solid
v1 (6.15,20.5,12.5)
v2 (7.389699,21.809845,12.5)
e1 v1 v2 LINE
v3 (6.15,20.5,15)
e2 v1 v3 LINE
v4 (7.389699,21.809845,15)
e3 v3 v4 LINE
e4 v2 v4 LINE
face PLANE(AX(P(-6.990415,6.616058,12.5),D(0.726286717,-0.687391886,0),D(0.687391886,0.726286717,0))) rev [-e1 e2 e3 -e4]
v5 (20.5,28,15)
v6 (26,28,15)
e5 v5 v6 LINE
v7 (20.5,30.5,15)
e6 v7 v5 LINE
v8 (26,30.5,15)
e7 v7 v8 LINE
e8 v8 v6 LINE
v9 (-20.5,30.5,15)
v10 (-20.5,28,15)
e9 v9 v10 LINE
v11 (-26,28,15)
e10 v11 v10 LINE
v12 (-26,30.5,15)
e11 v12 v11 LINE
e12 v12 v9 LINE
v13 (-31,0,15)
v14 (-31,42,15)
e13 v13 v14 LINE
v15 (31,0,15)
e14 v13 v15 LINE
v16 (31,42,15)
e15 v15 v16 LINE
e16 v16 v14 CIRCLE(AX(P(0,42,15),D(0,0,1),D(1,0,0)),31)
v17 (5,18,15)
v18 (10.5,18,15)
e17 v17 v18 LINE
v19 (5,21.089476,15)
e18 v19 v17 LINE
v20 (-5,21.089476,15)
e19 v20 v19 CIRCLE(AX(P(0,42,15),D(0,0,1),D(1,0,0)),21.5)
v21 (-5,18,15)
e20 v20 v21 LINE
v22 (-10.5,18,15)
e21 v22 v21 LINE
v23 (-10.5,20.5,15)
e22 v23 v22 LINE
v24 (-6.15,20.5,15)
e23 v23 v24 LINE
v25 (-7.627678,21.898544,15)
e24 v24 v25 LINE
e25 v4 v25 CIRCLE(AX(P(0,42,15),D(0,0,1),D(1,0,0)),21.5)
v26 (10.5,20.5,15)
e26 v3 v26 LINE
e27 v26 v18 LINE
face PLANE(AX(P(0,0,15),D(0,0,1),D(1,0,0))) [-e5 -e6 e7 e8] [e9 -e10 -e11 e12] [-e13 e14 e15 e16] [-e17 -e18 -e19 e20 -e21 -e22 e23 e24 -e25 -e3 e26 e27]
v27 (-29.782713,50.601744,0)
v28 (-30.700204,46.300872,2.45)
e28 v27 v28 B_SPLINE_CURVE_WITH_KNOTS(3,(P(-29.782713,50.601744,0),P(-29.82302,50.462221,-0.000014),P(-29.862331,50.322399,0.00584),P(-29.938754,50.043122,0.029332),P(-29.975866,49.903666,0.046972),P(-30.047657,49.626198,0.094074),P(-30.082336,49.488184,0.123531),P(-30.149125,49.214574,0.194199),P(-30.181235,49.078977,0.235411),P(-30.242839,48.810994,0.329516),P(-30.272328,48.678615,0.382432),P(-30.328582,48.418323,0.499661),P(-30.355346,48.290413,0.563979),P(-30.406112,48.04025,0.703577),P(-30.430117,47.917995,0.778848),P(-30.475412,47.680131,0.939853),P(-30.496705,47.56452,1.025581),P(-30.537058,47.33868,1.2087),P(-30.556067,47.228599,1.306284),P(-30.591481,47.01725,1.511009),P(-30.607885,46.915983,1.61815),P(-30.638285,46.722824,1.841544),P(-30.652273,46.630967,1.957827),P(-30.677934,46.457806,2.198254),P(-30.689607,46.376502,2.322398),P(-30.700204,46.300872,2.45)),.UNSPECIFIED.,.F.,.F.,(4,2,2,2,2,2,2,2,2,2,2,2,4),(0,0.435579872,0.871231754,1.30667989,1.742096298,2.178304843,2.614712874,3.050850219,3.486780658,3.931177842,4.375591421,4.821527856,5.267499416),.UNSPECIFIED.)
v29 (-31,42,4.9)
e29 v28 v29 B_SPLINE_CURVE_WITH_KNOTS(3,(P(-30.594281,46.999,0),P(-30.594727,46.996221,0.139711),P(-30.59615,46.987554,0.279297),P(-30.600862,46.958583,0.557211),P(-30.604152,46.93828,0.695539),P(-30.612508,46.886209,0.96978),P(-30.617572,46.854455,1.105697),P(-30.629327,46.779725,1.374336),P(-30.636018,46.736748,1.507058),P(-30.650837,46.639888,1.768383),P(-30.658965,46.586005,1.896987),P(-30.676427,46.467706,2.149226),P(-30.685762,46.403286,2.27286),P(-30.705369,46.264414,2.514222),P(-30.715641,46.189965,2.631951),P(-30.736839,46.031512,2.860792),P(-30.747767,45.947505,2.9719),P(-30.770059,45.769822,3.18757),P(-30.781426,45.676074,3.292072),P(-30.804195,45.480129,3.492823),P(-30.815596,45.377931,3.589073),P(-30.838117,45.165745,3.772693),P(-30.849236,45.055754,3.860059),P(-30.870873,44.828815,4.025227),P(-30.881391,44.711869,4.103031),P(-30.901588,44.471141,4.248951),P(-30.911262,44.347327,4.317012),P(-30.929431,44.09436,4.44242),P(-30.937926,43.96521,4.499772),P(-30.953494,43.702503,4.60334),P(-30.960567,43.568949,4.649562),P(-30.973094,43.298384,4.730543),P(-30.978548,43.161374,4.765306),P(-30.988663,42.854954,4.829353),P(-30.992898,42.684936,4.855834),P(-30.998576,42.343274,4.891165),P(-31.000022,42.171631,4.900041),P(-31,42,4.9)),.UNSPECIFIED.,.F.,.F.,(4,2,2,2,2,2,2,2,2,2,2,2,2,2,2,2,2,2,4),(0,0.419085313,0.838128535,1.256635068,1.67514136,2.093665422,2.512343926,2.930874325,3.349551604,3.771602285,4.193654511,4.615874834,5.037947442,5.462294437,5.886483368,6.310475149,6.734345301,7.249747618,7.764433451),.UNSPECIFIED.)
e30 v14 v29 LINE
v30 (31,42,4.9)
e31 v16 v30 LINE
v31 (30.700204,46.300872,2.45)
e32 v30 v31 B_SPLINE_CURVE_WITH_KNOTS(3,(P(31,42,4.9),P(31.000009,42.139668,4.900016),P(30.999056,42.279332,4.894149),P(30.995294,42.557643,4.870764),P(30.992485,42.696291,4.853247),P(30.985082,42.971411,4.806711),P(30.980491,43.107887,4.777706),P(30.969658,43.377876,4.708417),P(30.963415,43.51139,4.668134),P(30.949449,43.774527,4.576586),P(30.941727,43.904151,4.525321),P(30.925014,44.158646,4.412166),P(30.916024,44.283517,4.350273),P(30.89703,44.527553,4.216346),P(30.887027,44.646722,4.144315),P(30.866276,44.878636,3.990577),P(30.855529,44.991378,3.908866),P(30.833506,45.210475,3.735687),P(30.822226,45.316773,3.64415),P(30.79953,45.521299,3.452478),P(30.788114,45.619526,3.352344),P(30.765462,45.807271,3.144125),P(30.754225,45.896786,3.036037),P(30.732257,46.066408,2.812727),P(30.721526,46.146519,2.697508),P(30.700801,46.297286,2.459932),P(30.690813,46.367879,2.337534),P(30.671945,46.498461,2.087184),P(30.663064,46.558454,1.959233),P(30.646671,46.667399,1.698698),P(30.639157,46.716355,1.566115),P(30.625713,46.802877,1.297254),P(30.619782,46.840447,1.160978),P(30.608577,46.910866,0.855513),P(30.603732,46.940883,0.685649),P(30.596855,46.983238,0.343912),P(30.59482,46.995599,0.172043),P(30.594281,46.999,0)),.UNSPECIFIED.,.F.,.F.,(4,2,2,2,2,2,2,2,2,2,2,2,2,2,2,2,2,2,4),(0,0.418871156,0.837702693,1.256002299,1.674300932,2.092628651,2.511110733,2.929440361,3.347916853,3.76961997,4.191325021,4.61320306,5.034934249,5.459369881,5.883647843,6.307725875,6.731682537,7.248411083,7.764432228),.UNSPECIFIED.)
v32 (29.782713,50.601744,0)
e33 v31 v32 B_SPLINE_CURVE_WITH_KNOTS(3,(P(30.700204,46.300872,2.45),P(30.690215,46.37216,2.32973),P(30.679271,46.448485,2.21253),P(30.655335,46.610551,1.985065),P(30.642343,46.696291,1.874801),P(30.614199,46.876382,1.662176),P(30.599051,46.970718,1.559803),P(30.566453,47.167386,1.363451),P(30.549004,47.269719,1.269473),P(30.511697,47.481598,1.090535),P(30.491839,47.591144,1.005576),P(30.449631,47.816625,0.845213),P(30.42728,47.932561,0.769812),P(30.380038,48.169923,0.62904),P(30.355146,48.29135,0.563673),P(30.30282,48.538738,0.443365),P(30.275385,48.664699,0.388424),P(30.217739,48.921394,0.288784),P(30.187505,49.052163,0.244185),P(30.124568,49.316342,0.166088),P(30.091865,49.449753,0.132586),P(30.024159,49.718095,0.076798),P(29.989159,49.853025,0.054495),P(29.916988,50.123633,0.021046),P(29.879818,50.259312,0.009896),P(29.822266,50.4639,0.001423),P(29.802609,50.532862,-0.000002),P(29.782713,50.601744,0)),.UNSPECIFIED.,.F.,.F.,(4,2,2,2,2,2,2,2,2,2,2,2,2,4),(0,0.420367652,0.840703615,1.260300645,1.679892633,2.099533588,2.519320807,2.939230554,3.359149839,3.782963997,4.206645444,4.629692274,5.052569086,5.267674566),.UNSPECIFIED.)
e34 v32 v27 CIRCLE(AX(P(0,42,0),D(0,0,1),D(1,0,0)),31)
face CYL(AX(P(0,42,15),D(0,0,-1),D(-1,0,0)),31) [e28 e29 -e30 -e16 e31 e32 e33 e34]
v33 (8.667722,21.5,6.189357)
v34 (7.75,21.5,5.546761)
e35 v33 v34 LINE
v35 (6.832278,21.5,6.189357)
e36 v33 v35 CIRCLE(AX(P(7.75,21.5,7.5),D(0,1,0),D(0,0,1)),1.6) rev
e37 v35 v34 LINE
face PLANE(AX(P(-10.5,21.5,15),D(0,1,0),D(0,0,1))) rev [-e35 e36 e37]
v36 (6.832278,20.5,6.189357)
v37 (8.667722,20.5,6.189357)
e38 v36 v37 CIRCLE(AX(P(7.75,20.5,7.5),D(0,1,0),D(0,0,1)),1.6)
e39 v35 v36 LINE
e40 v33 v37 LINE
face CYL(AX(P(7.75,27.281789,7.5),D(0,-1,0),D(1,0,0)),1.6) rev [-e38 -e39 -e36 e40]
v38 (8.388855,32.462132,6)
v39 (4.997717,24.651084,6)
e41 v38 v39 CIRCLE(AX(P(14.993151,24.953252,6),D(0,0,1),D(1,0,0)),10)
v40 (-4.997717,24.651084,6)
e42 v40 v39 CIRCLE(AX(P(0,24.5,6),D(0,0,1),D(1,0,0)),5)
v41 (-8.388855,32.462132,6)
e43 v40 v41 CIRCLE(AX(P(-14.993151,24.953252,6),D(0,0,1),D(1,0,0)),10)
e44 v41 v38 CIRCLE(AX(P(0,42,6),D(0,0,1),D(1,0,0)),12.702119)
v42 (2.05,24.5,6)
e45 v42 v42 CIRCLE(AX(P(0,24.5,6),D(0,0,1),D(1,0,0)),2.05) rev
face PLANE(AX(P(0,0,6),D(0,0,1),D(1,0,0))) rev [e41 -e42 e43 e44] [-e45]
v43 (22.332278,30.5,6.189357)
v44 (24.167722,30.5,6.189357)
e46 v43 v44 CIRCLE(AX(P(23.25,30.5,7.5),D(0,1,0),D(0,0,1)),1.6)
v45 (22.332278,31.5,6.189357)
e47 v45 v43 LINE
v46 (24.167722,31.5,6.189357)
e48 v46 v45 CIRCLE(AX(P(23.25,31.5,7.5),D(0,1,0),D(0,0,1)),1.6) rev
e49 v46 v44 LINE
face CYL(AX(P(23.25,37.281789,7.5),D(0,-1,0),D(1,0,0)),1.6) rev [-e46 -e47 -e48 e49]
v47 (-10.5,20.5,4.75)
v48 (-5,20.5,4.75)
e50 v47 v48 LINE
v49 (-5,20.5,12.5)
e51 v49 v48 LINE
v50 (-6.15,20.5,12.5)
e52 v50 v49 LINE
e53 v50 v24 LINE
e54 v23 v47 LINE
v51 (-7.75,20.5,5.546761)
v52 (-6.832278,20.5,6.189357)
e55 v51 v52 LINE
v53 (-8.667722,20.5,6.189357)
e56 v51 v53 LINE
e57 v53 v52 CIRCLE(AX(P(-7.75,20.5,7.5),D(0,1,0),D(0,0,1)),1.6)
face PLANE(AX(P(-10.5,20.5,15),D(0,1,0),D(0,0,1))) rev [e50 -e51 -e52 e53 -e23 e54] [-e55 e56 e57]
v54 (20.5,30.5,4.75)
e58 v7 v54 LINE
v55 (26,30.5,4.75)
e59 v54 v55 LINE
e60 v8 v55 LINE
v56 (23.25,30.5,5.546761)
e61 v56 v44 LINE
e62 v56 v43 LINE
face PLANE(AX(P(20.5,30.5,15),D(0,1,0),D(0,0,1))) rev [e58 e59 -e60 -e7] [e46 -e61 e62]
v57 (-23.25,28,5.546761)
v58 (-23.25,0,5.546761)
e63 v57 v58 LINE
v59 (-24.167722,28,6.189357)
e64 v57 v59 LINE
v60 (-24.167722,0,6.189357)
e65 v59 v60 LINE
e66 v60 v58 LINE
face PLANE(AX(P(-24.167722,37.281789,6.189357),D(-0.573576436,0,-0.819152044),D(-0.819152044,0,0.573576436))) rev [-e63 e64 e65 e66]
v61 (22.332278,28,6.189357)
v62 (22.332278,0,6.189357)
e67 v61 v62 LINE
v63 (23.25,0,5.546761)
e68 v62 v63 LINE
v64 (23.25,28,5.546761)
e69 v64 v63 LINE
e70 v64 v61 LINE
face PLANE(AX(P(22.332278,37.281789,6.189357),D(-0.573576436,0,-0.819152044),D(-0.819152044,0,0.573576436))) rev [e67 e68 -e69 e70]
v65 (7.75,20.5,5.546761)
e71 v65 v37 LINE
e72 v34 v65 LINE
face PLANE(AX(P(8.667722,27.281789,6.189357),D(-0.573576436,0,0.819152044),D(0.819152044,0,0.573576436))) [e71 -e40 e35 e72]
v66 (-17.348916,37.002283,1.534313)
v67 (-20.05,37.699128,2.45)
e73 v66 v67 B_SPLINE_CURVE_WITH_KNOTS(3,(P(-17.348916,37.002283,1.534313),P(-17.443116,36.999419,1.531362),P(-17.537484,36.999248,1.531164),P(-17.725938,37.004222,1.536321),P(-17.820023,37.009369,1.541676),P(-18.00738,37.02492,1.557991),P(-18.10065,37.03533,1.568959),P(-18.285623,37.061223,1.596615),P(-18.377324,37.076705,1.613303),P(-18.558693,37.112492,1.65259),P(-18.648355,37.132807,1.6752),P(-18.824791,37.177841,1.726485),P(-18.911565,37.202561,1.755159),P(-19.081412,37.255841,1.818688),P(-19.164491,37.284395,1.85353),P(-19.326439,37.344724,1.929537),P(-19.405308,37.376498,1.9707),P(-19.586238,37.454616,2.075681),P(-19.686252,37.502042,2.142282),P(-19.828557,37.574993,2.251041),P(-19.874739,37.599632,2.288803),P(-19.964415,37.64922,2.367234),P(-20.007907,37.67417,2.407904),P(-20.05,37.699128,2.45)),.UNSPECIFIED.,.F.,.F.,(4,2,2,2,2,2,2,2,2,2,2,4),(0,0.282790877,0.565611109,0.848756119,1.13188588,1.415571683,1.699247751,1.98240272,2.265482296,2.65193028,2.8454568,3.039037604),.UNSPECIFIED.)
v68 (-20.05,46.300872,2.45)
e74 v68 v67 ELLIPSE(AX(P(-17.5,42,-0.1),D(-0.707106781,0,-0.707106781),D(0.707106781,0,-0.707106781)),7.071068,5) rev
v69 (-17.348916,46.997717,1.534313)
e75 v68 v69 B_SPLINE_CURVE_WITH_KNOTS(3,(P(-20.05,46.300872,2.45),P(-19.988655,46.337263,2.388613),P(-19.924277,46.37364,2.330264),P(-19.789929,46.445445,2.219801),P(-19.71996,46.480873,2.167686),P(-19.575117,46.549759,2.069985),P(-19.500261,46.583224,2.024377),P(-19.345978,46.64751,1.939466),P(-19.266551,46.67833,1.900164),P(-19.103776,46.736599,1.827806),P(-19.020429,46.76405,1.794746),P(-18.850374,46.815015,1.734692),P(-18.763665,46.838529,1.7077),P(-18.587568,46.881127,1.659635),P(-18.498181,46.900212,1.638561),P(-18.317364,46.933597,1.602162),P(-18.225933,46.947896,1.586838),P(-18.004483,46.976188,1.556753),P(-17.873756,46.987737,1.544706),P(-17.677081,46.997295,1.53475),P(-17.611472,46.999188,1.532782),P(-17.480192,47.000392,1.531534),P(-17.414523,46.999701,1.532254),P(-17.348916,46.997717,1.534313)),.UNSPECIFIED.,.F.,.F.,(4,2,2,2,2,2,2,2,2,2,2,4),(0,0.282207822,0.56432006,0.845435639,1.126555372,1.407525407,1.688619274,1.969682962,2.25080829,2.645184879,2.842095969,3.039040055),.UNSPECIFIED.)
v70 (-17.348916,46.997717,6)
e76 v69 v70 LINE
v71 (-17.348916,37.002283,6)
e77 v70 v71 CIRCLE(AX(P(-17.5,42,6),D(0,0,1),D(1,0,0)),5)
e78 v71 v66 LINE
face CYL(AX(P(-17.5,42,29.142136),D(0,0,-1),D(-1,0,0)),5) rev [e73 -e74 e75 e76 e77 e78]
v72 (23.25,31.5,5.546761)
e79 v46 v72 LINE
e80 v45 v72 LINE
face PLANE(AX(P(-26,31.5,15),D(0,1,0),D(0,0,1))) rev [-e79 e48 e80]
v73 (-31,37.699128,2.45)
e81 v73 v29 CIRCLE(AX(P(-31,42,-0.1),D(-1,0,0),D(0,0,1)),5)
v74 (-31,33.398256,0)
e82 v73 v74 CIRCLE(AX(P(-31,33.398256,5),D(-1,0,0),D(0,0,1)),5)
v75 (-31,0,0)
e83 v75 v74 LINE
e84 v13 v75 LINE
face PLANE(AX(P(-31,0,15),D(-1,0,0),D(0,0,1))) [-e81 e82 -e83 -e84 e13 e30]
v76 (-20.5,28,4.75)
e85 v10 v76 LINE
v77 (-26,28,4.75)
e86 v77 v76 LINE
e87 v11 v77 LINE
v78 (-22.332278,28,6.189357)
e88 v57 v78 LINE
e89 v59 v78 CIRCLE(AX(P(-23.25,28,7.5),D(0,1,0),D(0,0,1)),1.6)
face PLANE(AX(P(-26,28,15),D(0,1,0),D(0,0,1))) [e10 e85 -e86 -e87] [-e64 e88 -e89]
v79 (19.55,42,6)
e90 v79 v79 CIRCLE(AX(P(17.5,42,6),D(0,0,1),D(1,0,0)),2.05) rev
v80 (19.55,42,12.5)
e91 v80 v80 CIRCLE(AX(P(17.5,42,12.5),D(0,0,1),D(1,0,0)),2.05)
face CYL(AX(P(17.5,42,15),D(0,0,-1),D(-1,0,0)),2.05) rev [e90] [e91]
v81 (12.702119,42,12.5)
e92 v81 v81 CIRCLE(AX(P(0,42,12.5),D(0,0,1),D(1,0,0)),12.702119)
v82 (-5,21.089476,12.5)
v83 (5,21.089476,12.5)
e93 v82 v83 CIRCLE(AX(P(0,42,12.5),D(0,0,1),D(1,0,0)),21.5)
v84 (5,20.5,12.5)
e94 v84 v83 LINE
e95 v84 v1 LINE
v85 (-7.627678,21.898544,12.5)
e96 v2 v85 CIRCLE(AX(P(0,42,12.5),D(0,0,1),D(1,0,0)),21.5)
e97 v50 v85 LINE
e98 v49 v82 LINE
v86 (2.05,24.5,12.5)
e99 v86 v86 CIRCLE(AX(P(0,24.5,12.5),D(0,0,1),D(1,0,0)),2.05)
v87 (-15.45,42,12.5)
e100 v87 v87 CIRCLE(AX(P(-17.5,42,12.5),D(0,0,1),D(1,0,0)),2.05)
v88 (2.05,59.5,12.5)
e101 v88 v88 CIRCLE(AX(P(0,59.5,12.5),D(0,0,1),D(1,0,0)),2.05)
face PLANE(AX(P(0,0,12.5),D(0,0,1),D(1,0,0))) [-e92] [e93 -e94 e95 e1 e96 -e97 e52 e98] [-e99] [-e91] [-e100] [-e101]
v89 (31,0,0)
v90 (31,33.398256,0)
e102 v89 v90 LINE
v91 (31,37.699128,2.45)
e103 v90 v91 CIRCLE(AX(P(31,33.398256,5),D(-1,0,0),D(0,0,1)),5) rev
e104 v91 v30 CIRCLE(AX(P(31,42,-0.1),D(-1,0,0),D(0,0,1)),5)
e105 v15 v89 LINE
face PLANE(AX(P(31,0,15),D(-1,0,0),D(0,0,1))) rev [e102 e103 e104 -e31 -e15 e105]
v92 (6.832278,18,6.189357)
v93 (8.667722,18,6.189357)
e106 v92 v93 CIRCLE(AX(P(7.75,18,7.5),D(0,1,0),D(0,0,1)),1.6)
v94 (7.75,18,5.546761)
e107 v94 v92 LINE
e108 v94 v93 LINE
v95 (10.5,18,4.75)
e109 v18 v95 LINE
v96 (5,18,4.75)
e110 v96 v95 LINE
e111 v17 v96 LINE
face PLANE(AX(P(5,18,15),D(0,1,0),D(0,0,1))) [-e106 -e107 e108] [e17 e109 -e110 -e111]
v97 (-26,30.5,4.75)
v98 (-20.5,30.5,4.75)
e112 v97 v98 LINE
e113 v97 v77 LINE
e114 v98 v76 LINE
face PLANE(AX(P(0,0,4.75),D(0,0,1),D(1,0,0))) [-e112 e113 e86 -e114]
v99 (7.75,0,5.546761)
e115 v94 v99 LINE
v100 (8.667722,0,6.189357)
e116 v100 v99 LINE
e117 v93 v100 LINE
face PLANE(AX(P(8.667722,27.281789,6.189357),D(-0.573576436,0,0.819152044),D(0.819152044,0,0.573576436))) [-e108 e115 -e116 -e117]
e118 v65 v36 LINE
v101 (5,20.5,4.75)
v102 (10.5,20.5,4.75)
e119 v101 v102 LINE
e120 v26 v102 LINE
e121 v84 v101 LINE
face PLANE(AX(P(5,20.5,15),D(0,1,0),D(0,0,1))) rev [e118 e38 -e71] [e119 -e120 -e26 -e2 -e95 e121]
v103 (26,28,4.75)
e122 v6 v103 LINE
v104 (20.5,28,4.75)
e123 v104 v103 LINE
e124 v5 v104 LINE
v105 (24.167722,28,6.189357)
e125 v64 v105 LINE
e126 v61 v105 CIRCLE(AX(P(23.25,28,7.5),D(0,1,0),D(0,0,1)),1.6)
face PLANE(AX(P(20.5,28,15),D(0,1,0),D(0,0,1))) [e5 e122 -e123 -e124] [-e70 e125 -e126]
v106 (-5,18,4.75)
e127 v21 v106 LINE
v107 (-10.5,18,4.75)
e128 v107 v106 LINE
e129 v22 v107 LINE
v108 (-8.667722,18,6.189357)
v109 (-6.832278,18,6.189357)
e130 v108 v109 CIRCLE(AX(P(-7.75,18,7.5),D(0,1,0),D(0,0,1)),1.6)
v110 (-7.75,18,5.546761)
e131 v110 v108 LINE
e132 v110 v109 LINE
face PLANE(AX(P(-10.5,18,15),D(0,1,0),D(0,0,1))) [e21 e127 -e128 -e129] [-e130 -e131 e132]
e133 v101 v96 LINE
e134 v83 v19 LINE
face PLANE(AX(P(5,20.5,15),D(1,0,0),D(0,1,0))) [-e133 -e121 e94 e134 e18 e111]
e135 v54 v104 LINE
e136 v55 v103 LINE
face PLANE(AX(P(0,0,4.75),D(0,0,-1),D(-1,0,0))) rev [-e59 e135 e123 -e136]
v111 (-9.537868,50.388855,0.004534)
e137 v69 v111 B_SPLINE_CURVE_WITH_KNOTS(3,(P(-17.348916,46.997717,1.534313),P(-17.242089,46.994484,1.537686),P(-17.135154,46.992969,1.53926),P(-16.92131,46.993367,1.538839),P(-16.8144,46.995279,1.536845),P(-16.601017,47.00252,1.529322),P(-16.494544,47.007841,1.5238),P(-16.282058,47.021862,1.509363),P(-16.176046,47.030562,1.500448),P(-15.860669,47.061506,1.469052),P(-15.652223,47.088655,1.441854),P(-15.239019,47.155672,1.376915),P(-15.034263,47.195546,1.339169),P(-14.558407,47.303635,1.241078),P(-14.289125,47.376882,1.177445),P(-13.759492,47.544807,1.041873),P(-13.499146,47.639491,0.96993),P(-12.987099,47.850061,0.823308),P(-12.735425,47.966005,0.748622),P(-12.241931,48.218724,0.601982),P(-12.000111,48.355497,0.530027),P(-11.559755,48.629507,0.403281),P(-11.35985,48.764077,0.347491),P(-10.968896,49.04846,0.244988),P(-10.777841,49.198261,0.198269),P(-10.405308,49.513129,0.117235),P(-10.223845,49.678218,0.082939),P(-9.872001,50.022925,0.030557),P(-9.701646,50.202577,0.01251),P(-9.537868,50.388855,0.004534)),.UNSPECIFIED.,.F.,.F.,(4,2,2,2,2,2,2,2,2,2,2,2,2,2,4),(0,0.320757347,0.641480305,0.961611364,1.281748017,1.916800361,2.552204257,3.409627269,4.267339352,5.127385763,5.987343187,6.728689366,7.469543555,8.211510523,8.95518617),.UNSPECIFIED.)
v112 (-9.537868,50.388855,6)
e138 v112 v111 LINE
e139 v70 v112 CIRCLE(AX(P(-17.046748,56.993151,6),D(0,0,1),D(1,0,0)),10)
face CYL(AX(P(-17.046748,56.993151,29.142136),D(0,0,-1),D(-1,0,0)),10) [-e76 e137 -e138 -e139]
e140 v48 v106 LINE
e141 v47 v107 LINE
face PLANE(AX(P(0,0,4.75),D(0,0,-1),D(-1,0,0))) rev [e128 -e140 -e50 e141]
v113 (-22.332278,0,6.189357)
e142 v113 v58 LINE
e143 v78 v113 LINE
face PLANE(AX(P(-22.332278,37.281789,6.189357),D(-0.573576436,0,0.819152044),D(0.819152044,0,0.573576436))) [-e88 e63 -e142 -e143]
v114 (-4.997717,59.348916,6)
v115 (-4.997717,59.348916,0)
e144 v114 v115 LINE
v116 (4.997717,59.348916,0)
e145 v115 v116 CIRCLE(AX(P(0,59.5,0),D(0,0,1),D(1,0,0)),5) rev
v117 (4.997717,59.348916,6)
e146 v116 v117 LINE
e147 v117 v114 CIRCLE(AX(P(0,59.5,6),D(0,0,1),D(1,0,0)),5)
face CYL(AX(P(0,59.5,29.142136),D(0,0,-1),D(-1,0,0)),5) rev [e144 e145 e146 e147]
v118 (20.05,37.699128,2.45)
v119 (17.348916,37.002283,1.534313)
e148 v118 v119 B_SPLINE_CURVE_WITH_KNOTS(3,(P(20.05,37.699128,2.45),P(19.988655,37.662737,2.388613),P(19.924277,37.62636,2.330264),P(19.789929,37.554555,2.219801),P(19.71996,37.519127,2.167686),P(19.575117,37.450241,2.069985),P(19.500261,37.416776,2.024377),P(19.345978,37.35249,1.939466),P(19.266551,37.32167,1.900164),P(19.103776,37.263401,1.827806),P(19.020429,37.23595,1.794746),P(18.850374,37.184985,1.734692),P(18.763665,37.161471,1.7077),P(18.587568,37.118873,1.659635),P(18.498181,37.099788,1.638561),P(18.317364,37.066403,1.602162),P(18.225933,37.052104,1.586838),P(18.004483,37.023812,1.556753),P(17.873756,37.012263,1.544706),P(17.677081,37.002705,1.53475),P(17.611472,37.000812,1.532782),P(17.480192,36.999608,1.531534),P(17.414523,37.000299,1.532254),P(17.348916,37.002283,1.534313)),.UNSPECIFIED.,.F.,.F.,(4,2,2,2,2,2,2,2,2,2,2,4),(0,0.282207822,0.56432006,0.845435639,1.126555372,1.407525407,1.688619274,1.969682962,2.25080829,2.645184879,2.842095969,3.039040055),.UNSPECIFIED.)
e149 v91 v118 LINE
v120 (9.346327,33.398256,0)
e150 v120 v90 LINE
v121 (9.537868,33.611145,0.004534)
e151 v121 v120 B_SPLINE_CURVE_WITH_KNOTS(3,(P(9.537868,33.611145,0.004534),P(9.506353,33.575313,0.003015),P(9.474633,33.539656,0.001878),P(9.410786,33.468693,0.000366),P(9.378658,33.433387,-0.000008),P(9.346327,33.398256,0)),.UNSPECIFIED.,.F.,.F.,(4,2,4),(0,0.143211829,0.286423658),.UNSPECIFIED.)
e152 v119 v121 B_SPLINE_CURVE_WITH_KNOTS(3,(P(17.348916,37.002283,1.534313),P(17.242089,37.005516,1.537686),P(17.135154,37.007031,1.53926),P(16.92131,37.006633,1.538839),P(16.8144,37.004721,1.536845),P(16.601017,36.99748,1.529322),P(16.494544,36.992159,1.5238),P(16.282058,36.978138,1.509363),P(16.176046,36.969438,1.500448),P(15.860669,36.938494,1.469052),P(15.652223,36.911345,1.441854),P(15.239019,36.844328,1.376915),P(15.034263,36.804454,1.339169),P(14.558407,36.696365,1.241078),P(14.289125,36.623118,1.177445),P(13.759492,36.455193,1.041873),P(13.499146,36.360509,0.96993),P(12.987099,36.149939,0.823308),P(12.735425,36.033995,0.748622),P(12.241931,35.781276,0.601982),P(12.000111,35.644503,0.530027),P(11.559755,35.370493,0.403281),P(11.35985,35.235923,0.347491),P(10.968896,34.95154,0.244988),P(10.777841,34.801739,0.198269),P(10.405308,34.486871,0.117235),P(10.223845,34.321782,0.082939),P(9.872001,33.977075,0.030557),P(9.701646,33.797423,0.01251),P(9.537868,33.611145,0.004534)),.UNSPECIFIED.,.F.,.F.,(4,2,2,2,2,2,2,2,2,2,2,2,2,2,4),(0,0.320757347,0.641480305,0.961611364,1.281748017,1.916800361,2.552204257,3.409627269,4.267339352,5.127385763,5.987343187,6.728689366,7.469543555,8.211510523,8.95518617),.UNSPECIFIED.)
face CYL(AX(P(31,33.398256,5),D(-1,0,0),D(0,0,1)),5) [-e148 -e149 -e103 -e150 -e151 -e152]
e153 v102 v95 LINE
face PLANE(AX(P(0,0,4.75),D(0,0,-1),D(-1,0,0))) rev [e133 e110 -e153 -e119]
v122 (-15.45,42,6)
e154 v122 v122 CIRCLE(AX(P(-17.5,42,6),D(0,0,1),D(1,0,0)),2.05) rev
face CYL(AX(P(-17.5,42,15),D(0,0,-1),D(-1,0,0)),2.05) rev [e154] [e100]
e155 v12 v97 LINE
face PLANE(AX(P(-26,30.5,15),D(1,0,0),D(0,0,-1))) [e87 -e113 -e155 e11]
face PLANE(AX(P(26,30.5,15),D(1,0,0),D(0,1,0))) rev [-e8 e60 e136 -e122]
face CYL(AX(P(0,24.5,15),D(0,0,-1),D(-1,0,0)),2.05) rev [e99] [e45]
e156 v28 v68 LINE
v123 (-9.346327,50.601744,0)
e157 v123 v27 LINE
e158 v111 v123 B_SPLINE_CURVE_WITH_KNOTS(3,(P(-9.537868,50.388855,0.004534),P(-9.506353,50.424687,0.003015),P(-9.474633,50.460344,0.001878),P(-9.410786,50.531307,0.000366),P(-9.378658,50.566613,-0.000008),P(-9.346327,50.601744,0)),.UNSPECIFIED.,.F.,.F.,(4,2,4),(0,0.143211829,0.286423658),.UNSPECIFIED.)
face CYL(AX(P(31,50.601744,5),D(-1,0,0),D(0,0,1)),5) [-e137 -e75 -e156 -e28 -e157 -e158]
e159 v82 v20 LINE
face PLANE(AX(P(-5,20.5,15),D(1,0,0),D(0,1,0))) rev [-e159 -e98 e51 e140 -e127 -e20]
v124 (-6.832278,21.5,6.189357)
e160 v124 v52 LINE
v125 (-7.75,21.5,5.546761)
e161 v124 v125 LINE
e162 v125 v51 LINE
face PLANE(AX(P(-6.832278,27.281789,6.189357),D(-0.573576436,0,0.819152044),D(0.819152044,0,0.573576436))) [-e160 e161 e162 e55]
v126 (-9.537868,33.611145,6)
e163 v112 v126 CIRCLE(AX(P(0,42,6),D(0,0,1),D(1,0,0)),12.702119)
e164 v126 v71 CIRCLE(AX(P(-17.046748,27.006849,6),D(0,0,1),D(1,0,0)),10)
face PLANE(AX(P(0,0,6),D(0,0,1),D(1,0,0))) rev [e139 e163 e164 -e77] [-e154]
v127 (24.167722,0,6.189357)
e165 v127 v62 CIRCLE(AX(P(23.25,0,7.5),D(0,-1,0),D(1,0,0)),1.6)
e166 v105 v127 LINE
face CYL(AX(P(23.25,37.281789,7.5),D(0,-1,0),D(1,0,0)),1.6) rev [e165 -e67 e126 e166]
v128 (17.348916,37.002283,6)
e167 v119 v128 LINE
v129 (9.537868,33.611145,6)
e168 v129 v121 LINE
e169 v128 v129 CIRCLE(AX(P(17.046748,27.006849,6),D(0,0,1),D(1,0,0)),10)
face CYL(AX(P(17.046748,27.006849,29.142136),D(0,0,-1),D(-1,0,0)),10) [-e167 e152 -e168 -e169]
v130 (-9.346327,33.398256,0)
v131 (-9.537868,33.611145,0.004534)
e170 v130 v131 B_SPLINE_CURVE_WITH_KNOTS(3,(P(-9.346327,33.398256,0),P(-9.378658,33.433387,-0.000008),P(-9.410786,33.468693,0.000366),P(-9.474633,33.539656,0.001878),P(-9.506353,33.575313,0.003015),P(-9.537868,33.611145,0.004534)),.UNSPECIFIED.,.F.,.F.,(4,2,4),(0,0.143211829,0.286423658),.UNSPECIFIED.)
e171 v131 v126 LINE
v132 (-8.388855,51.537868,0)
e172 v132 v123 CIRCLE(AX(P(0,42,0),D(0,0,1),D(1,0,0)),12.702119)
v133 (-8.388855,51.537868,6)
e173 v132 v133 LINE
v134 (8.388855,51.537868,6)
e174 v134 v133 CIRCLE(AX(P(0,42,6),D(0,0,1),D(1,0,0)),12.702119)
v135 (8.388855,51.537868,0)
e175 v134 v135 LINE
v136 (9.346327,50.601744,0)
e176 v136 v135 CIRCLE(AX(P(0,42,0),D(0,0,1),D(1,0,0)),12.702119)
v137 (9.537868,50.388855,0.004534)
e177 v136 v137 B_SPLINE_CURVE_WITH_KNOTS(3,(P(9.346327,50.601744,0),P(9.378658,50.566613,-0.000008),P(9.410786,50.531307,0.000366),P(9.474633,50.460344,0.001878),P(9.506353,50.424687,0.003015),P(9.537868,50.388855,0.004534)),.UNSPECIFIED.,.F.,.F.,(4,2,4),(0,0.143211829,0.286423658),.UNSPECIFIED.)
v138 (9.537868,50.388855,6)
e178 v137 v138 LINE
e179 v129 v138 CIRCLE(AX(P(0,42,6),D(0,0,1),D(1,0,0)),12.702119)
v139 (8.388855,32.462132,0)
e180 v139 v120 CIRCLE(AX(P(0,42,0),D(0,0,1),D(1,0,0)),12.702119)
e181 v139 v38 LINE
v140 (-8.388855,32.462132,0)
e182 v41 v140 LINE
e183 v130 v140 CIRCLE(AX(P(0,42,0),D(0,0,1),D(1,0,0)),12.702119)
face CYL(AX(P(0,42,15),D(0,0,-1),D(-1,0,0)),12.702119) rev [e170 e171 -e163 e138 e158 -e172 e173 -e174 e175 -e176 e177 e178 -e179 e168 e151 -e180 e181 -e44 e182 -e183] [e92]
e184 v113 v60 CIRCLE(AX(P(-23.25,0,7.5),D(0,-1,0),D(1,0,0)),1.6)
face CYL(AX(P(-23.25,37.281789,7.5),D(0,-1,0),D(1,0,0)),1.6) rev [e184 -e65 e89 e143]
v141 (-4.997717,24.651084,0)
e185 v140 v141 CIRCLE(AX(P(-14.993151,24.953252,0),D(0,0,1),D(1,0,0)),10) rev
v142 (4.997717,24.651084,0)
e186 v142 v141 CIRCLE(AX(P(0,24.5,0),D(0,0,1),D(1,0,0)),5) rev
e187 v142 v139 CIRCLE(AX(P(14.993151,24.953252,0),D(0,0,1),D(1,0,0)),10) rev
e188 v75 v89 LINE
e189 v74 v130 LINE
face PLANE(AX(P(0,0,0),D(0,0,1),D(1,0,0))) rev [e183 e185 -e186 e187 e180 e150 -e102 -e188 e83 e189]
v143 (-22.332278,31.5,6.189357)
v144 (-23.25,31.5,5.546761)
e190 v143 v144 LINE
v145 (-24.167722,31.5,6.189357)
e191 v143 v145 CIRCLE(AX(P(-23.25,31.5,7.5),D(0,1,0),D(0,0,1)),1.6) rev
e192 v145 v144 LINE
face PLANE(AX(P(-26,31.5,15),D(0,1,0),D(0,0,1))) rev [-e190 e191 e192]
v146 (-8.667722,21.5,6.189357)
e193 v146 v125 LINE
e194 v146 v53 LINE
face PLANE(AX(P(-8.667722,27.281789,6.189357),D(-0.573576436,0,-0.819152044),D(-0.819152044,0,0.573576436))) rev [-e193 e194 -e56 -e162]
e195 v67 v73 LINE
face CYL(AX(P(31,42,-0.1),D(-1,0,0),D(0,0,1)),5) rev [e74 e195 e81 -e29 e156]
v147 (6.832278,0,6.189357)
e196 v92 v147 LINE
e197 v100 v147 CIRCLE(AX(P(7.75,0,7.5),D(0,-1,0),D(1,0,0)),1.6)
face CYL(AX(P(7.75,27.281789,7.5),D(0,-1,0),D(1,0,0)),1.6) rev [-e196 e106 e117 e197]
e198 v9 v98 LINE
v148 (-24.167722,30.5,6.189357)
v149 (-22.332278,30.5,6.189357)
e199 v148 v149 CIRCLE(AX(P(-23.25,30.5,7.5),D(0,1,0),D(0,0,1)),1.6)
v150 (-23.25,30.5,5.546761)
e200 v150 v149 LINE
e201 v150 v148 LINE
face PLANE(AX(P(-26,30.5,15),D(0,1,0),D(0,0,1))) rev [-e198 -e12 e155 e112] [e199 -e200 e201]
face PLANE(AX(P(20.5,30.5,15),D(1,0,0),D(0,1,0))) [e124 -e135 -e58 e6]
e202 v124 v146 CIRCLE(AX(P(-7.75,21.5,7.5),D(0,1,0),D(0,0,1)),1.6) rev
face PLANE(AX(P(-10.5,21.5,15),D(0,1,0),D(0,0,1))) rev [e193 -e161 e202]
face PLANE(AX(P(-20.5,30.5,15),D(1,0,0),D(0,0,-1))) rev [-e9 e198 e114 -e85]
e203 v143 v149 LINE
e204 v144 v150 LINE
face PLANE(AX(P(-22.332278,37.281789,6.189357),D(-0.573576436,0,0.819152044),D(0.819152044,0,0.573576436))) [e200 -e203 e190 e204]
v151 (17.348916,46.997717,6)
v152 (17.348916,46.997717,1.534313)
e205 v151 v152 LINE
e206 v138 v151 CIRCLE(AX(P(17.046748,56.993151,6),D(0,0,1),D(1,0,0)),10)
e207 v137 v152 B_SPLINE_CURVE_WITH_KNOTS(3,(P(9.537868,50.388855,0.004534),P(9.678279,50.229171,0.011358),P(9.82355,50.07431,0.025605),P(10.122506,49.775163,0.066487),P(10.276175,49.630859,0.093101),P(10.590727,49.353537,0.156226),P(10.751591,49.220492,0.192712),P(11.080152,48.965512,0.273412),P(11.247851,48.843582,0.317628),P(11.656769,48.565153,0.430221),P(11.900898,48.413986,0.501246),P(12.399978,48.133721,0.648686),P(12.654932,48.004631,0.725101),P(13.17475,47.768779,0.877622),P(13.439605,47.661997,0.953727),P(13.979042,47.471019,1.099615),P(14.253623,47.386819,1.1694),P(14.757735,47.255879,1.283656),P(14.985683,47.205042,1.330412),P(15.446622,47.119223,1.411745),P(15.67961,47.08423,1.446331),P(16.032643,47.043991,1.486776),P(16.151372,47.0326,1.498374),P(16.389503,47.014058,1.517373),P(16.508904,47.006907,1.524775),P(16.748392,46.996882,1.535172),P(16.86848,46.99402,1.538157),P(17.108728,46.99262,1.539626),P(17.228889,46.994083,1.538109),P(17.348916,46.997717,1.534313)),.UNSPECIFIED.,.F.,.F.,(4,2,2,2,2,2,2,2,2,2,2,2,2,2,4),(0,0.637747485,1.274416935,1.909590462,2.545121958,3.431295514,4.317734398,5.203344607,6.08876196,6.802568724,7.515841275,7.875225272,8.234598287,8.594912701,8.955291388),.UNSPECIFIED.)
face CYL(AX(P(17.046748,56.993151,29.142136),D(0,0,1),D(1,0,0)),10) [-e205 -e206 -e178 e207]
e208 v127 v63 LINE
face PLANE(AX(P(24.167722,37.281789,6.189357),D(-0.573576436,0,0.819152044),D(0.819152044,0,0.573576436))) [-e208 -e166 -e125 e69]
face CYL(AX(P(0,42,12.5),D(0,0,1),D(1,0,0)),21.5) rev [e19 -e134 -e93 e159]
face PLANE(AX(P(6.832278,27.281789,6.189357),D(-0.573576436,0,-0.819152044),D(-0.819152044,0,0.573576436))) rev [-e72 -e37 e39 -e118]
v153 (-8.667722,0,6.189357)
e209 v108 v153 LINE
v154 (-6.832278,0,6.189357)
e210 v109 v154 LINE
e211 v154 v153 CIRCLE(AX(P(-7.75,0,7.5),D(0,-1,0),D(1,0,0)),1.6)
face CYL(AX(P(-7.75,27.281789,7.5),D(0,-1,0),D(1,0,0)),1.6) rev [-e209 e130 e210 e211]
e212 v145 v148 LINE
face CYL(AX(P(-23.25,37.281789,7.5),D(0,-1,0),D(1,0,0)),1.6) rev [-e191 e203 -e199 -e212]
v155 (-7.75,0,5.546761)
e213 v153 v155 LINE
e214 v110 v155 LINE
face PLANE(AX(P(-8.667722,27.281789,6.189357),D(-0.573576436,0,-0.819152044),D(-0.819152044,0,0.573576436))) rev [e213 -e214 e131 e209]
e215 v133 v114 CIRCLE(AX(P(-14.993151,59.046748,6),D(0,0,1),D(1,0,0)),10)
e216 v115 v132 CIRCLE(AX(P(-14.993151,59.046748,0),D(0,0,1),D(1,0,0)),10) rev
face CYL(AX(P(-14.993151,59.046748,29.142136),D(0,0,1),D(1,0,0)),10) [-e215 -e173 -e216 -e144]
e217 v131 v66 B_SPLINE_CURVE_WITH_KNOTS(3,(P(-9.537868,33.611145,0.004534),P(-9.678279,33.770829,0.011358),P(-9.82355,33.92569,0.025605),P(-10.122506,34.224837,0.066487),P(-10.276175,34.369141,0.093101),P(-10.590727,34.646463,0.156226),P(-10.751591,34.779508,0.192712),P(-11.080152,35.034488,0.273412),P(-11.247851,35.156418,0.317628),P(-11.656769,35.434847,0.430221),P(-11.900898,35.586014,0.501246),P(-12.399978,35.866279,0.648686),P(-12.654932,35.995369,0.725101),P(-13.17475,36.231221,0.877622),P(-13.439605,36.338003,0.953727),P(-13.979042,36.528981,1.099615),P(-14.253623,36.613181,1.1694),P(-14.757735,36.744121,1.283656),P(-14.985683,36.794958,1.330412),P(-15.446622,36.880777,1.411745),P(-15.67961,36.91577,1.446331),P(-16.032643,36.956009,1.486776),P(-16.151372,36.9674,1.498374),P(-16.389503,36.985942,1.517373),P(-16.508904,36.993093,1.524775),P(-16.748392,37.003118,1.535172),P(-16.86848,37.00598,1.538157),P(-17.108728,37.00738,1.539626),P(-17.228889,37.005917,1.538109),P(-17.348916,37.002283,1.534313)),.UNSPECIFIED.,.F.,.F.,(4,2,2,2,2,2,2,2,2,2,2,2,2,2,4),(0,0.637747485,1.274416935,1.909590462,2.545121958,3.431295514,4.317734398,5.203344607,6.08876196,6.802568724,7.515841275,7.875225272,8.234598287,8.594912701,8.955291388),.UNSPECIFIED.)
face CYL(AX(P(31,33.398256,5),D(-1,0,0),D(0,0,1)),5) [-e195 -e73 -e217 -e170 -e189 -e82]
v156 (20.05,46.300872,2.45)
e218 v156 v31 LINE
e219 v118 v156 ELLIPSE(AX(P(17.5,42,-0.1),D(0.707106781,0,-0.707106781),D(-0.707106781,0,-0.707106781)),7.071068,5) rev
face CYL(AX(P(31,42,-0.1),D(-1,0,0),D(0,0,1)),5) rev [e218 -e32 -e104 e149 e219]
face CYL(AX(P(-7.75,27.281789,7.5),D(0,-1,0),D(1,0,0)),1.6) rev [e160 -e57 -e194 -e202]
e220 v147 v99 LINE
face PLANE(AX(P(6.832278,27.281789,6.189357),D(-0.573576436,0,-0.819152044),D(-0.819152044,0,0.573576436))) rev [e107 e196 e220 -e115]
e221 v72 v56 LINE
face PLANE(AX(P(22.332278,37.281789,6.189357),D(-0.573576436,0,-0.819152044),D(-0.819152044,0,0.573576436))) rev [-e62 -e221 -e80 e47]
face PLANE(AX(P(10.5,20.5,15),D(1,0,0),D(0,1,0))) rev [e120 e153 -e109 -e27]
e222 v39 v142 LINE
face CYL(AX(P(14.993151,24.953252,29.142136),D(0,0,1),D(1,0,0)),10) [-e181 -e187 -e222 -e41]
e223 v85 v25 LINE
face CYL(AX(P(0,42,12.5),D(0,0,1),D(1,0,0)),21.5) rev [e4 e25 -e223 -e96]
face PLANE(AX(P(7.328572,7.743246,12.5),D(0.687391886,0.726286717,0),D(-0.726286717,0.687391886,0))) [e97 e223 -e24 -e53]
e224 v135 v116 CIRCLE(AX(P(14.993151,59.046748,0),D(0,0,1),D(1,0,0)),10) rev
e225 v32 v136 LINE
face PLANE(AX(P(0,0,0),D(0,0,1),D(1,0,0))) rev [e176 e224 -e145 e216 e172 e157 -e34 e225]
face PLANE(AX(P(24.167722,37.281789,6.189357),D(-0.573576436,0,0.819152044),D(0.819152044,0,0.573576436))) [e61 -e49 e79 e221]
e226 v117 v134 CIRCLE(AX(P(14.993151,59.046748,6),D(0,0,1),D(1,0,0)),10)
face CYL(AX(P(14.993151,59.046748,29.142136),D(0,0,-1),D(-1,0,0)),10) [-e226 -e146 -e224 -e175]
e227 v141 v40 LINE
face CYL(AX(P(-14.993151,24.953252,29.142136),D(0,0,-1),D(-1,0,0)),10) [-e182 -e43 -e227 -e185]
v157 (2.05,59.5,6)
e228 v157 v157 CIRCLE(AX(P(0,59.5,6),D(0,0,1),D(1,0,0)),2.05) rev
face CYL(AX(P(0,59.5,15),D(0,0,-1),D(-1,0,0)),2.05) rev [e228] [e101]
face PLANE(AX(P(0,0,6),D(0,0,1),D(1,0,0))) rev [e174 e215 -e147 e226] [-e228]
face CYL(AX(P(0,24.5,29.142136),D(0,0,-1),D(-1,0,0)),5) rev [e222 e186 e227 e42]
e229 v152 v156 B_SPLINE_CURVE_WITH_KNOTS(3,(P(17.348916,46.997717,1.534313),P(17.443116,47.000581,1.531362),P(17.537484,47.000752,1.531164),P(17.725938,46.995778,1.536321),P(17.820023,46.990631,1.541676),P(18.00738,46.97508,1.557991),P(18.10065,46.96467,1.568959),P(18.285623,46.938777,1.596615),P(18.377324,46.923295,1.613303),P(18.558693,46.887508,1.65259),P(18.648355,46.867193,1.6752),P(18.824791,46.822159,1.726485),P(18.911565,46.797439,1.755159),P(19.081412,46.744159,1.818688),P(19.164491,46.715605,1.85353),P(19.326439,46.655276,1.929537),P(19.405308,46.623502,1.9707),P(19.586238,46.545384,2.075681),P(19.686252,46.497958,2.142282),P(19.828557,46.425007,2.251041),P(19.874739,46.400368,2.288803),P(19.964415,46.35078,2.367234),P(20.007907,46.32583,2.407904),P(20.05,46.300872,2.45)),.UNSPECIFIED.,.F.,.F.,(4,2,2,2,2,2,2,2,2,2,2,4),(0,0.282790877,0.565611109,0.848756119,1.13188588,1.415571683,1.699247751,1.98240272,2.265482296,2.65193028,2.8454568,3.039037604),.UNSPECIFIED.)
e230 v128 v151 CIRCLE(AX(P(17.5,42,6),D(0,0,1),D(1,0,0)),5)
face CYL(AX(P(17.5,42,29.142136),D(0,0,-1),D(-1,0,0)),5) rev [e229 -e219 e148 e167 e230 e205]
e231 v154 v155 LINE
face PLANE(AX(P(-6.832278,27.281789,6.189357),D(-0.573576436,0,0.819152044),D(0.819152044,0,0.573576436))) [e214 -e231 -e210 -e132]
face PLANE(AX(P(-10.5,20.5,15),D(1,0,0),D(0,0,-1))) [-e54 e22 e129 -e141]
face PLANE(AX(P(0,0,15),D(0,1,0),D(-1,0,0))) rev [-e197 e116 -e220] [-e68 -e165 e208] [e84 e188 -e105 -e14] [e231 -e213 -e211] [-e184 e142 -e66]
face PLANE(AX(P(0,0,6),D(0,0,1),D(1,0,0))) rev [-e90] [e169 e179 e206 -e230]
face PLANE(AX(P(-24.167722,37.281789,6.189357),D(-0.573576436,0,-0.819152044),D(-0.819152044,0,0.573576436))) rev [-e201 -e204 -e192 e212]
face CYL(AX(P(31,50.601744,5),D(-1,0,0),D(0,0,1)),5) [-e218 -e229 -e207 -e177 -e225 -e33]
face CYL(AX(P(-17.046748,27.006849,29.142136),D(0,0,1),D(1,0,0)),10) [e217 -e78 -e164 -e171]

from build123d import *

# Parameters (mm, degrees)
SKETCH1_R                = 12.702118755
BOSS_EXTRUDE1_DEPTH      = 15
SKETCH1_3_R              = 5
CUT_EXTRUDE1_DEPTH       = 6
CUT_EXTRUDE3_DEPTH       = 81.715549927
CUT_EXTRUDE3_DEPTH_BACK  = 81.715549927
SKETCH1_4_R              = 2.05
FILLET1_R                = 10
CUT_EXTRUDE12_DEPTH      = 81.715550074
CUT_EXTRUDE12_DEPTH_BACK = 2.75
CUT_EXTRUDE12_START      = -7.5
SKETCH3_W                = 5.5
SKETCH3_H                = 2.5
CUT_EXTRUDE13_DEPTH      = 31.5
CUT_EXTRUDE14_DEPTH      = 21.5
CUT_EXTRUDE15_DEPTH      = 97.943282542
CUT_EXTRUDE15_DEPTH_BACK = 97.943282542
SKETCH4_R                = 5
FILLET2_R                = 5
CUT_EXTRUDE17_START      = -2.5
SKETCH6_R                = 2.05
SKETCH6_R_2              = 12.702118755
CUT_EXTRUDE17_DEPTH      = 2.5


with BuildPart() as part:
    # Sketch1 → Boss-Extrude1 (new body)
    with BuildSketch(Plane(origin=(0, 0, 0), x_dir=(0, 1, 0), z_dir=(0, 0, 1))):
        with BuildLine():
            Line((0, 31), (0, -31))
            Line((0, -31), (42, -31))
            ThreePointArc((42, -31), (73, 0), (42, 31))
            Line((42, 31), (0, 31))
        make_face()
        with Locations(Location((42, 0, 0), (0, 0, 270))):
            Circle(SKETCH1_R, mode=Mode.SUBTRACT)
    extrude(amount=BOSS_EXTRUDE1_DEPTH)

    # Sketch1<3> → Cut-Extrude1 (cut)
    with BuildSketch(Plane(origin=(0, 0, 0), x_dir=(0, 1, 0), z_dir=(0, 0, 1))):
        with Locations((59.5, 0)):
            Circle(SKETCH1_3_R)
        with Locations((42, -17.5)):
            Circle(SKETCH1_3_R)
        with Locations((24.5, 0)):
            Circle(SKETCH1_3_R)
        with Locations((42, 17.5)):
            Circle(SKETCH1_3_R)
    extrude(amount=CUT_EXTRUDE1_DEPTH, mode=Mode.SUBTRACT)

    # Sketch1<4> → Cut-Extrude3 (cut, two sides: drawn at the far end of the back side and taken through both)
    with BuildSketch(Plane(origin=(0, 0, 0), x_dir=(0, 1, 0), z_dir=(0, 0, 1)).offset(-CUT_EXTRUDE3_DEPTH_BACK)):
        with Locations(Location((59.5, 0, 0), (0, 0, 270))):
            Circle(SKETCH1_4_R)
        with Locations(Location((42, -17.5, 0), (0, 0, 270))):
            Circle(SKETCH1_4_R)
        with Locations(Location((24.5, 0, 0), (0, 0, 270))):
            Circle(SKETCH1_4_R)
        with Locations(Location((42, 17.5, 0), (0, 0, 270))):
            Circle(SKETCH1_4_R)
    extrude(amount=CUT_EXTRUDE3_DEPTH + CUT_EXTRUDE3_DEPTH_BACK, mode=Mode.SUBTRACT)

    # Fillet1
    fillet1_edges = [part.edges().sort_by_distance(p)[0] for p in [
        (-1.197579289, 29.354462261, 3),
        (1.197579289, 29.354462261, 3),
        (-12.645537739, 43.197579289, 3),
        (-12.645537739, 40.802420711, 3),
        (1.197579289, 54.645537739, 3),
        (-1.197579289, 54.645537739, 3),
        (12.645537739, 40.802420711, 3),
        (12.645537739, 43.197579289, 3),
    ]]
    fillet(fillet1_edges, radius=FILLET1_R)

    # Sketch3 → Cut-Extrude12 (cut, two sides: drawn at the far end of the back side and taken through both)
    with BuildSketch(Plane.XY.offset(15).offset(CUT_EXTRUDE12_START - CUT_EXTRUDE12_DEPTH_BACK)):
        with Locations((-23.25, 29.25)):
            Rectangle(SKETCH3_W, SKETCH3_H)
        with Locations((-7.75, 19.25)):
            Rectangle(SKETCH3_W, SKETCH3_H)
        with Locations((7.75, 19.25)):
            Rectangle(SKETCH3_W, SKETCH3_H)
        with Locations((23.25, 29.25)):
            Rectangle(SKETCH3_W, SKETCH3_H)
    extrude(amount=CUT_EXTRUDE12_DEPTH + CUT_EXTRUDE12_DEPTH_BACK, mode=Mode.SUBTRACT)

    # Sketch2 → Cut-Extrude13 (cut)
    with BuildSketch(Plane.XZ):
        with BuildLine():
            Line((-22.332277702, 6.189356729), (-23.25, 5.546760658))
            Line((-23.25, 5.546760658), (-24.167722298, 6.189356729))
            ThreePointArc((-24.167722298, 6.189356729), (-23.25, 9.1), (-22.332277702, 6.189356729))
        make_face()
        with BuildLine():
            Line((22.332277702, 6.189356729), (23.25, 5.546760658))
            Line((23.25, 5.546760658), (24.167722298, 6.189356729))
            ThreePointArc((24.167722298, 6.189356729), (23.25, 9.1), (22.332277702, 6.189356729))
        make_face()
    extrude(amount=-CUT_EXTRUDE13_DEPTH, mode=Mode.SUBTRACT)

    # Sketch2<3> → Cut-Extrude14 (cut)
    with BuildSketch(Plane.XZ):
        with BuildLine():
            Line((-8.667722298, 6.189356729), (-7.75, 5.546760658))
            Line((-7.75, 5.546760658), (-6.832277702, 6.189356729))
            ThreePointArc((-6.832277702, 6.189356729), (-7.75, 9.1), (-8.667722298, 6.189356729))
        make_face()
        with BuildLine():
            Line((6.832277702, 6.189356729), (7.75, 5.546760658))
            Line((7.75, 5.546760658), (8.667722298, 6.189356729))
            ThreePointArc((8.667722298, 6.189356729), (7.75, 9.1), (6.832277702, 6.189356729))
        make_face()
    extrude(amount=-CUT_EXTRUDE14_DEPTH, mode=Mode.SUBTRACT)

    # Sketch4 → Cut-Extrude15 (cut, two sides: drawn at the far end of the back side and taken through both)
    with BuildSketch(Plane(origin=(-31, 0, 0), x_dir=(0, -1, 0), z_dir=(-1, 0, 0)).offset(-CUT_EXTRUDE15_DEPTH_BACK)):
        with Locations((-42, -0.1)):
            Circle(SKETCH4_R)
    extrude(amount=CUT_EXTRUDE15_DEPTH + CUT_EXTRUDE15_DEPTH_BACK, mode=Mode.SUBTRACT)

    # Fillet2
    # the kernel refuses this fillet: 5 mm, written as the material it takes off along each edge
    with BuildSketch(Plane(origin=(-8.593139727, 37.0010001, 0), x_dir=(0, 0.2740416493582673, 0.9617178247370693), z_dir=(-1, 0, 0)), Plane(origin=(40.006860273, 37.0010001, 0), x_dir=(0, 0.2740416493582673, 0.9617178247370693), z_dir=(-1, 0, 0))) as fillet2_piece_1:
        with BuildLine():
            CenterArc((3.821287186, -4.835031475), FILLET2_R, 104.758918872, 59.336170258)
            Line((-0.987301938, -3.464823228), (0, 0))
            ThreePointArc((0, 0), (1.273762395, -0.164968525), (2.547524791, 0))
        make_face()
    extrude(amount=31.413720546, mode=Mode.SUBTRACT)
    with BuildSketch(Plane(origin=(-8.593139727, 46.9989999, 0), x_dir=(0, 1, 0), z_dir=(-1, 0, 0)), Plane(origin=(39.601140784, 46.9989999, 0), x_dir=(0, 1, 0), z_dir=(-1, 0, 0))) as fillet2_piece_2:
        with BuildLine():
            CenterArc((3.602744109, -5), FILLET2_R, 90, 59.336170258)
            ThreePointArc((-0.698127895, -2.45), (-0.190410776, -1.270208247), (0, 0))
            Line((0, 0), (3.602744109, 0))
        make_face()
    extrude(amount=31.008001057, mode=Mode.SUBTRACT)

    # Sketch6 → Cut-Extrude17 (cut)
    with BuildSketch(Plane.XY.offset(15).offset(CUT_EXTRUDE17_START)):
        with BuildLine():
            Line((-7.62767837, 21.898544265), (-6.15, 20.5))
            Line((-6.15, 20.5), (-5, 20.5))
            Line((-5, 20.5), (-5, 21.089476334))
            ThreePointArc((-5, 21.089476334), (0, 20.5), (5, 21.089476334))
            Line((5, 21.089476334), (5, 20.5))
            Line((5, 20.5), (6.15, 20.5))
            Line((6.15, 20.5), (7.389699175, 21.809845318))
            ThreePointArc((7.389699175, 21.809845318), (0.126985826, 63.499624987), (-7.62767837, 21.898544265))
        make_face()
        with Locations((0, 59.5)):
            Circle(SKETCH6_R, mode=Mode.SUBTRACT)
        with Locations((0, 24.5)):
            Circle(SKETCH6_R, mode=Mode.SUBTRACT)
        with Locations((-17.5, 42)):
            Circle(SKETCH6_R, mode=Mode.SUBTRACT)
        with Locations(Location((0, 42, 0), (0, 0, 221.332642507))):
            Circle(SKETCH6_R_2, mode=Mode.SUBTRACT)
        with Locations((17.5, 42)):
            Circle(SKETCH6_R, mode=Mode.SUBTRACT)
    extrude(amount=CUT_EXTRUDE17_DEPTH, mode=Mode.SUBTRACT)


solid = part.part
